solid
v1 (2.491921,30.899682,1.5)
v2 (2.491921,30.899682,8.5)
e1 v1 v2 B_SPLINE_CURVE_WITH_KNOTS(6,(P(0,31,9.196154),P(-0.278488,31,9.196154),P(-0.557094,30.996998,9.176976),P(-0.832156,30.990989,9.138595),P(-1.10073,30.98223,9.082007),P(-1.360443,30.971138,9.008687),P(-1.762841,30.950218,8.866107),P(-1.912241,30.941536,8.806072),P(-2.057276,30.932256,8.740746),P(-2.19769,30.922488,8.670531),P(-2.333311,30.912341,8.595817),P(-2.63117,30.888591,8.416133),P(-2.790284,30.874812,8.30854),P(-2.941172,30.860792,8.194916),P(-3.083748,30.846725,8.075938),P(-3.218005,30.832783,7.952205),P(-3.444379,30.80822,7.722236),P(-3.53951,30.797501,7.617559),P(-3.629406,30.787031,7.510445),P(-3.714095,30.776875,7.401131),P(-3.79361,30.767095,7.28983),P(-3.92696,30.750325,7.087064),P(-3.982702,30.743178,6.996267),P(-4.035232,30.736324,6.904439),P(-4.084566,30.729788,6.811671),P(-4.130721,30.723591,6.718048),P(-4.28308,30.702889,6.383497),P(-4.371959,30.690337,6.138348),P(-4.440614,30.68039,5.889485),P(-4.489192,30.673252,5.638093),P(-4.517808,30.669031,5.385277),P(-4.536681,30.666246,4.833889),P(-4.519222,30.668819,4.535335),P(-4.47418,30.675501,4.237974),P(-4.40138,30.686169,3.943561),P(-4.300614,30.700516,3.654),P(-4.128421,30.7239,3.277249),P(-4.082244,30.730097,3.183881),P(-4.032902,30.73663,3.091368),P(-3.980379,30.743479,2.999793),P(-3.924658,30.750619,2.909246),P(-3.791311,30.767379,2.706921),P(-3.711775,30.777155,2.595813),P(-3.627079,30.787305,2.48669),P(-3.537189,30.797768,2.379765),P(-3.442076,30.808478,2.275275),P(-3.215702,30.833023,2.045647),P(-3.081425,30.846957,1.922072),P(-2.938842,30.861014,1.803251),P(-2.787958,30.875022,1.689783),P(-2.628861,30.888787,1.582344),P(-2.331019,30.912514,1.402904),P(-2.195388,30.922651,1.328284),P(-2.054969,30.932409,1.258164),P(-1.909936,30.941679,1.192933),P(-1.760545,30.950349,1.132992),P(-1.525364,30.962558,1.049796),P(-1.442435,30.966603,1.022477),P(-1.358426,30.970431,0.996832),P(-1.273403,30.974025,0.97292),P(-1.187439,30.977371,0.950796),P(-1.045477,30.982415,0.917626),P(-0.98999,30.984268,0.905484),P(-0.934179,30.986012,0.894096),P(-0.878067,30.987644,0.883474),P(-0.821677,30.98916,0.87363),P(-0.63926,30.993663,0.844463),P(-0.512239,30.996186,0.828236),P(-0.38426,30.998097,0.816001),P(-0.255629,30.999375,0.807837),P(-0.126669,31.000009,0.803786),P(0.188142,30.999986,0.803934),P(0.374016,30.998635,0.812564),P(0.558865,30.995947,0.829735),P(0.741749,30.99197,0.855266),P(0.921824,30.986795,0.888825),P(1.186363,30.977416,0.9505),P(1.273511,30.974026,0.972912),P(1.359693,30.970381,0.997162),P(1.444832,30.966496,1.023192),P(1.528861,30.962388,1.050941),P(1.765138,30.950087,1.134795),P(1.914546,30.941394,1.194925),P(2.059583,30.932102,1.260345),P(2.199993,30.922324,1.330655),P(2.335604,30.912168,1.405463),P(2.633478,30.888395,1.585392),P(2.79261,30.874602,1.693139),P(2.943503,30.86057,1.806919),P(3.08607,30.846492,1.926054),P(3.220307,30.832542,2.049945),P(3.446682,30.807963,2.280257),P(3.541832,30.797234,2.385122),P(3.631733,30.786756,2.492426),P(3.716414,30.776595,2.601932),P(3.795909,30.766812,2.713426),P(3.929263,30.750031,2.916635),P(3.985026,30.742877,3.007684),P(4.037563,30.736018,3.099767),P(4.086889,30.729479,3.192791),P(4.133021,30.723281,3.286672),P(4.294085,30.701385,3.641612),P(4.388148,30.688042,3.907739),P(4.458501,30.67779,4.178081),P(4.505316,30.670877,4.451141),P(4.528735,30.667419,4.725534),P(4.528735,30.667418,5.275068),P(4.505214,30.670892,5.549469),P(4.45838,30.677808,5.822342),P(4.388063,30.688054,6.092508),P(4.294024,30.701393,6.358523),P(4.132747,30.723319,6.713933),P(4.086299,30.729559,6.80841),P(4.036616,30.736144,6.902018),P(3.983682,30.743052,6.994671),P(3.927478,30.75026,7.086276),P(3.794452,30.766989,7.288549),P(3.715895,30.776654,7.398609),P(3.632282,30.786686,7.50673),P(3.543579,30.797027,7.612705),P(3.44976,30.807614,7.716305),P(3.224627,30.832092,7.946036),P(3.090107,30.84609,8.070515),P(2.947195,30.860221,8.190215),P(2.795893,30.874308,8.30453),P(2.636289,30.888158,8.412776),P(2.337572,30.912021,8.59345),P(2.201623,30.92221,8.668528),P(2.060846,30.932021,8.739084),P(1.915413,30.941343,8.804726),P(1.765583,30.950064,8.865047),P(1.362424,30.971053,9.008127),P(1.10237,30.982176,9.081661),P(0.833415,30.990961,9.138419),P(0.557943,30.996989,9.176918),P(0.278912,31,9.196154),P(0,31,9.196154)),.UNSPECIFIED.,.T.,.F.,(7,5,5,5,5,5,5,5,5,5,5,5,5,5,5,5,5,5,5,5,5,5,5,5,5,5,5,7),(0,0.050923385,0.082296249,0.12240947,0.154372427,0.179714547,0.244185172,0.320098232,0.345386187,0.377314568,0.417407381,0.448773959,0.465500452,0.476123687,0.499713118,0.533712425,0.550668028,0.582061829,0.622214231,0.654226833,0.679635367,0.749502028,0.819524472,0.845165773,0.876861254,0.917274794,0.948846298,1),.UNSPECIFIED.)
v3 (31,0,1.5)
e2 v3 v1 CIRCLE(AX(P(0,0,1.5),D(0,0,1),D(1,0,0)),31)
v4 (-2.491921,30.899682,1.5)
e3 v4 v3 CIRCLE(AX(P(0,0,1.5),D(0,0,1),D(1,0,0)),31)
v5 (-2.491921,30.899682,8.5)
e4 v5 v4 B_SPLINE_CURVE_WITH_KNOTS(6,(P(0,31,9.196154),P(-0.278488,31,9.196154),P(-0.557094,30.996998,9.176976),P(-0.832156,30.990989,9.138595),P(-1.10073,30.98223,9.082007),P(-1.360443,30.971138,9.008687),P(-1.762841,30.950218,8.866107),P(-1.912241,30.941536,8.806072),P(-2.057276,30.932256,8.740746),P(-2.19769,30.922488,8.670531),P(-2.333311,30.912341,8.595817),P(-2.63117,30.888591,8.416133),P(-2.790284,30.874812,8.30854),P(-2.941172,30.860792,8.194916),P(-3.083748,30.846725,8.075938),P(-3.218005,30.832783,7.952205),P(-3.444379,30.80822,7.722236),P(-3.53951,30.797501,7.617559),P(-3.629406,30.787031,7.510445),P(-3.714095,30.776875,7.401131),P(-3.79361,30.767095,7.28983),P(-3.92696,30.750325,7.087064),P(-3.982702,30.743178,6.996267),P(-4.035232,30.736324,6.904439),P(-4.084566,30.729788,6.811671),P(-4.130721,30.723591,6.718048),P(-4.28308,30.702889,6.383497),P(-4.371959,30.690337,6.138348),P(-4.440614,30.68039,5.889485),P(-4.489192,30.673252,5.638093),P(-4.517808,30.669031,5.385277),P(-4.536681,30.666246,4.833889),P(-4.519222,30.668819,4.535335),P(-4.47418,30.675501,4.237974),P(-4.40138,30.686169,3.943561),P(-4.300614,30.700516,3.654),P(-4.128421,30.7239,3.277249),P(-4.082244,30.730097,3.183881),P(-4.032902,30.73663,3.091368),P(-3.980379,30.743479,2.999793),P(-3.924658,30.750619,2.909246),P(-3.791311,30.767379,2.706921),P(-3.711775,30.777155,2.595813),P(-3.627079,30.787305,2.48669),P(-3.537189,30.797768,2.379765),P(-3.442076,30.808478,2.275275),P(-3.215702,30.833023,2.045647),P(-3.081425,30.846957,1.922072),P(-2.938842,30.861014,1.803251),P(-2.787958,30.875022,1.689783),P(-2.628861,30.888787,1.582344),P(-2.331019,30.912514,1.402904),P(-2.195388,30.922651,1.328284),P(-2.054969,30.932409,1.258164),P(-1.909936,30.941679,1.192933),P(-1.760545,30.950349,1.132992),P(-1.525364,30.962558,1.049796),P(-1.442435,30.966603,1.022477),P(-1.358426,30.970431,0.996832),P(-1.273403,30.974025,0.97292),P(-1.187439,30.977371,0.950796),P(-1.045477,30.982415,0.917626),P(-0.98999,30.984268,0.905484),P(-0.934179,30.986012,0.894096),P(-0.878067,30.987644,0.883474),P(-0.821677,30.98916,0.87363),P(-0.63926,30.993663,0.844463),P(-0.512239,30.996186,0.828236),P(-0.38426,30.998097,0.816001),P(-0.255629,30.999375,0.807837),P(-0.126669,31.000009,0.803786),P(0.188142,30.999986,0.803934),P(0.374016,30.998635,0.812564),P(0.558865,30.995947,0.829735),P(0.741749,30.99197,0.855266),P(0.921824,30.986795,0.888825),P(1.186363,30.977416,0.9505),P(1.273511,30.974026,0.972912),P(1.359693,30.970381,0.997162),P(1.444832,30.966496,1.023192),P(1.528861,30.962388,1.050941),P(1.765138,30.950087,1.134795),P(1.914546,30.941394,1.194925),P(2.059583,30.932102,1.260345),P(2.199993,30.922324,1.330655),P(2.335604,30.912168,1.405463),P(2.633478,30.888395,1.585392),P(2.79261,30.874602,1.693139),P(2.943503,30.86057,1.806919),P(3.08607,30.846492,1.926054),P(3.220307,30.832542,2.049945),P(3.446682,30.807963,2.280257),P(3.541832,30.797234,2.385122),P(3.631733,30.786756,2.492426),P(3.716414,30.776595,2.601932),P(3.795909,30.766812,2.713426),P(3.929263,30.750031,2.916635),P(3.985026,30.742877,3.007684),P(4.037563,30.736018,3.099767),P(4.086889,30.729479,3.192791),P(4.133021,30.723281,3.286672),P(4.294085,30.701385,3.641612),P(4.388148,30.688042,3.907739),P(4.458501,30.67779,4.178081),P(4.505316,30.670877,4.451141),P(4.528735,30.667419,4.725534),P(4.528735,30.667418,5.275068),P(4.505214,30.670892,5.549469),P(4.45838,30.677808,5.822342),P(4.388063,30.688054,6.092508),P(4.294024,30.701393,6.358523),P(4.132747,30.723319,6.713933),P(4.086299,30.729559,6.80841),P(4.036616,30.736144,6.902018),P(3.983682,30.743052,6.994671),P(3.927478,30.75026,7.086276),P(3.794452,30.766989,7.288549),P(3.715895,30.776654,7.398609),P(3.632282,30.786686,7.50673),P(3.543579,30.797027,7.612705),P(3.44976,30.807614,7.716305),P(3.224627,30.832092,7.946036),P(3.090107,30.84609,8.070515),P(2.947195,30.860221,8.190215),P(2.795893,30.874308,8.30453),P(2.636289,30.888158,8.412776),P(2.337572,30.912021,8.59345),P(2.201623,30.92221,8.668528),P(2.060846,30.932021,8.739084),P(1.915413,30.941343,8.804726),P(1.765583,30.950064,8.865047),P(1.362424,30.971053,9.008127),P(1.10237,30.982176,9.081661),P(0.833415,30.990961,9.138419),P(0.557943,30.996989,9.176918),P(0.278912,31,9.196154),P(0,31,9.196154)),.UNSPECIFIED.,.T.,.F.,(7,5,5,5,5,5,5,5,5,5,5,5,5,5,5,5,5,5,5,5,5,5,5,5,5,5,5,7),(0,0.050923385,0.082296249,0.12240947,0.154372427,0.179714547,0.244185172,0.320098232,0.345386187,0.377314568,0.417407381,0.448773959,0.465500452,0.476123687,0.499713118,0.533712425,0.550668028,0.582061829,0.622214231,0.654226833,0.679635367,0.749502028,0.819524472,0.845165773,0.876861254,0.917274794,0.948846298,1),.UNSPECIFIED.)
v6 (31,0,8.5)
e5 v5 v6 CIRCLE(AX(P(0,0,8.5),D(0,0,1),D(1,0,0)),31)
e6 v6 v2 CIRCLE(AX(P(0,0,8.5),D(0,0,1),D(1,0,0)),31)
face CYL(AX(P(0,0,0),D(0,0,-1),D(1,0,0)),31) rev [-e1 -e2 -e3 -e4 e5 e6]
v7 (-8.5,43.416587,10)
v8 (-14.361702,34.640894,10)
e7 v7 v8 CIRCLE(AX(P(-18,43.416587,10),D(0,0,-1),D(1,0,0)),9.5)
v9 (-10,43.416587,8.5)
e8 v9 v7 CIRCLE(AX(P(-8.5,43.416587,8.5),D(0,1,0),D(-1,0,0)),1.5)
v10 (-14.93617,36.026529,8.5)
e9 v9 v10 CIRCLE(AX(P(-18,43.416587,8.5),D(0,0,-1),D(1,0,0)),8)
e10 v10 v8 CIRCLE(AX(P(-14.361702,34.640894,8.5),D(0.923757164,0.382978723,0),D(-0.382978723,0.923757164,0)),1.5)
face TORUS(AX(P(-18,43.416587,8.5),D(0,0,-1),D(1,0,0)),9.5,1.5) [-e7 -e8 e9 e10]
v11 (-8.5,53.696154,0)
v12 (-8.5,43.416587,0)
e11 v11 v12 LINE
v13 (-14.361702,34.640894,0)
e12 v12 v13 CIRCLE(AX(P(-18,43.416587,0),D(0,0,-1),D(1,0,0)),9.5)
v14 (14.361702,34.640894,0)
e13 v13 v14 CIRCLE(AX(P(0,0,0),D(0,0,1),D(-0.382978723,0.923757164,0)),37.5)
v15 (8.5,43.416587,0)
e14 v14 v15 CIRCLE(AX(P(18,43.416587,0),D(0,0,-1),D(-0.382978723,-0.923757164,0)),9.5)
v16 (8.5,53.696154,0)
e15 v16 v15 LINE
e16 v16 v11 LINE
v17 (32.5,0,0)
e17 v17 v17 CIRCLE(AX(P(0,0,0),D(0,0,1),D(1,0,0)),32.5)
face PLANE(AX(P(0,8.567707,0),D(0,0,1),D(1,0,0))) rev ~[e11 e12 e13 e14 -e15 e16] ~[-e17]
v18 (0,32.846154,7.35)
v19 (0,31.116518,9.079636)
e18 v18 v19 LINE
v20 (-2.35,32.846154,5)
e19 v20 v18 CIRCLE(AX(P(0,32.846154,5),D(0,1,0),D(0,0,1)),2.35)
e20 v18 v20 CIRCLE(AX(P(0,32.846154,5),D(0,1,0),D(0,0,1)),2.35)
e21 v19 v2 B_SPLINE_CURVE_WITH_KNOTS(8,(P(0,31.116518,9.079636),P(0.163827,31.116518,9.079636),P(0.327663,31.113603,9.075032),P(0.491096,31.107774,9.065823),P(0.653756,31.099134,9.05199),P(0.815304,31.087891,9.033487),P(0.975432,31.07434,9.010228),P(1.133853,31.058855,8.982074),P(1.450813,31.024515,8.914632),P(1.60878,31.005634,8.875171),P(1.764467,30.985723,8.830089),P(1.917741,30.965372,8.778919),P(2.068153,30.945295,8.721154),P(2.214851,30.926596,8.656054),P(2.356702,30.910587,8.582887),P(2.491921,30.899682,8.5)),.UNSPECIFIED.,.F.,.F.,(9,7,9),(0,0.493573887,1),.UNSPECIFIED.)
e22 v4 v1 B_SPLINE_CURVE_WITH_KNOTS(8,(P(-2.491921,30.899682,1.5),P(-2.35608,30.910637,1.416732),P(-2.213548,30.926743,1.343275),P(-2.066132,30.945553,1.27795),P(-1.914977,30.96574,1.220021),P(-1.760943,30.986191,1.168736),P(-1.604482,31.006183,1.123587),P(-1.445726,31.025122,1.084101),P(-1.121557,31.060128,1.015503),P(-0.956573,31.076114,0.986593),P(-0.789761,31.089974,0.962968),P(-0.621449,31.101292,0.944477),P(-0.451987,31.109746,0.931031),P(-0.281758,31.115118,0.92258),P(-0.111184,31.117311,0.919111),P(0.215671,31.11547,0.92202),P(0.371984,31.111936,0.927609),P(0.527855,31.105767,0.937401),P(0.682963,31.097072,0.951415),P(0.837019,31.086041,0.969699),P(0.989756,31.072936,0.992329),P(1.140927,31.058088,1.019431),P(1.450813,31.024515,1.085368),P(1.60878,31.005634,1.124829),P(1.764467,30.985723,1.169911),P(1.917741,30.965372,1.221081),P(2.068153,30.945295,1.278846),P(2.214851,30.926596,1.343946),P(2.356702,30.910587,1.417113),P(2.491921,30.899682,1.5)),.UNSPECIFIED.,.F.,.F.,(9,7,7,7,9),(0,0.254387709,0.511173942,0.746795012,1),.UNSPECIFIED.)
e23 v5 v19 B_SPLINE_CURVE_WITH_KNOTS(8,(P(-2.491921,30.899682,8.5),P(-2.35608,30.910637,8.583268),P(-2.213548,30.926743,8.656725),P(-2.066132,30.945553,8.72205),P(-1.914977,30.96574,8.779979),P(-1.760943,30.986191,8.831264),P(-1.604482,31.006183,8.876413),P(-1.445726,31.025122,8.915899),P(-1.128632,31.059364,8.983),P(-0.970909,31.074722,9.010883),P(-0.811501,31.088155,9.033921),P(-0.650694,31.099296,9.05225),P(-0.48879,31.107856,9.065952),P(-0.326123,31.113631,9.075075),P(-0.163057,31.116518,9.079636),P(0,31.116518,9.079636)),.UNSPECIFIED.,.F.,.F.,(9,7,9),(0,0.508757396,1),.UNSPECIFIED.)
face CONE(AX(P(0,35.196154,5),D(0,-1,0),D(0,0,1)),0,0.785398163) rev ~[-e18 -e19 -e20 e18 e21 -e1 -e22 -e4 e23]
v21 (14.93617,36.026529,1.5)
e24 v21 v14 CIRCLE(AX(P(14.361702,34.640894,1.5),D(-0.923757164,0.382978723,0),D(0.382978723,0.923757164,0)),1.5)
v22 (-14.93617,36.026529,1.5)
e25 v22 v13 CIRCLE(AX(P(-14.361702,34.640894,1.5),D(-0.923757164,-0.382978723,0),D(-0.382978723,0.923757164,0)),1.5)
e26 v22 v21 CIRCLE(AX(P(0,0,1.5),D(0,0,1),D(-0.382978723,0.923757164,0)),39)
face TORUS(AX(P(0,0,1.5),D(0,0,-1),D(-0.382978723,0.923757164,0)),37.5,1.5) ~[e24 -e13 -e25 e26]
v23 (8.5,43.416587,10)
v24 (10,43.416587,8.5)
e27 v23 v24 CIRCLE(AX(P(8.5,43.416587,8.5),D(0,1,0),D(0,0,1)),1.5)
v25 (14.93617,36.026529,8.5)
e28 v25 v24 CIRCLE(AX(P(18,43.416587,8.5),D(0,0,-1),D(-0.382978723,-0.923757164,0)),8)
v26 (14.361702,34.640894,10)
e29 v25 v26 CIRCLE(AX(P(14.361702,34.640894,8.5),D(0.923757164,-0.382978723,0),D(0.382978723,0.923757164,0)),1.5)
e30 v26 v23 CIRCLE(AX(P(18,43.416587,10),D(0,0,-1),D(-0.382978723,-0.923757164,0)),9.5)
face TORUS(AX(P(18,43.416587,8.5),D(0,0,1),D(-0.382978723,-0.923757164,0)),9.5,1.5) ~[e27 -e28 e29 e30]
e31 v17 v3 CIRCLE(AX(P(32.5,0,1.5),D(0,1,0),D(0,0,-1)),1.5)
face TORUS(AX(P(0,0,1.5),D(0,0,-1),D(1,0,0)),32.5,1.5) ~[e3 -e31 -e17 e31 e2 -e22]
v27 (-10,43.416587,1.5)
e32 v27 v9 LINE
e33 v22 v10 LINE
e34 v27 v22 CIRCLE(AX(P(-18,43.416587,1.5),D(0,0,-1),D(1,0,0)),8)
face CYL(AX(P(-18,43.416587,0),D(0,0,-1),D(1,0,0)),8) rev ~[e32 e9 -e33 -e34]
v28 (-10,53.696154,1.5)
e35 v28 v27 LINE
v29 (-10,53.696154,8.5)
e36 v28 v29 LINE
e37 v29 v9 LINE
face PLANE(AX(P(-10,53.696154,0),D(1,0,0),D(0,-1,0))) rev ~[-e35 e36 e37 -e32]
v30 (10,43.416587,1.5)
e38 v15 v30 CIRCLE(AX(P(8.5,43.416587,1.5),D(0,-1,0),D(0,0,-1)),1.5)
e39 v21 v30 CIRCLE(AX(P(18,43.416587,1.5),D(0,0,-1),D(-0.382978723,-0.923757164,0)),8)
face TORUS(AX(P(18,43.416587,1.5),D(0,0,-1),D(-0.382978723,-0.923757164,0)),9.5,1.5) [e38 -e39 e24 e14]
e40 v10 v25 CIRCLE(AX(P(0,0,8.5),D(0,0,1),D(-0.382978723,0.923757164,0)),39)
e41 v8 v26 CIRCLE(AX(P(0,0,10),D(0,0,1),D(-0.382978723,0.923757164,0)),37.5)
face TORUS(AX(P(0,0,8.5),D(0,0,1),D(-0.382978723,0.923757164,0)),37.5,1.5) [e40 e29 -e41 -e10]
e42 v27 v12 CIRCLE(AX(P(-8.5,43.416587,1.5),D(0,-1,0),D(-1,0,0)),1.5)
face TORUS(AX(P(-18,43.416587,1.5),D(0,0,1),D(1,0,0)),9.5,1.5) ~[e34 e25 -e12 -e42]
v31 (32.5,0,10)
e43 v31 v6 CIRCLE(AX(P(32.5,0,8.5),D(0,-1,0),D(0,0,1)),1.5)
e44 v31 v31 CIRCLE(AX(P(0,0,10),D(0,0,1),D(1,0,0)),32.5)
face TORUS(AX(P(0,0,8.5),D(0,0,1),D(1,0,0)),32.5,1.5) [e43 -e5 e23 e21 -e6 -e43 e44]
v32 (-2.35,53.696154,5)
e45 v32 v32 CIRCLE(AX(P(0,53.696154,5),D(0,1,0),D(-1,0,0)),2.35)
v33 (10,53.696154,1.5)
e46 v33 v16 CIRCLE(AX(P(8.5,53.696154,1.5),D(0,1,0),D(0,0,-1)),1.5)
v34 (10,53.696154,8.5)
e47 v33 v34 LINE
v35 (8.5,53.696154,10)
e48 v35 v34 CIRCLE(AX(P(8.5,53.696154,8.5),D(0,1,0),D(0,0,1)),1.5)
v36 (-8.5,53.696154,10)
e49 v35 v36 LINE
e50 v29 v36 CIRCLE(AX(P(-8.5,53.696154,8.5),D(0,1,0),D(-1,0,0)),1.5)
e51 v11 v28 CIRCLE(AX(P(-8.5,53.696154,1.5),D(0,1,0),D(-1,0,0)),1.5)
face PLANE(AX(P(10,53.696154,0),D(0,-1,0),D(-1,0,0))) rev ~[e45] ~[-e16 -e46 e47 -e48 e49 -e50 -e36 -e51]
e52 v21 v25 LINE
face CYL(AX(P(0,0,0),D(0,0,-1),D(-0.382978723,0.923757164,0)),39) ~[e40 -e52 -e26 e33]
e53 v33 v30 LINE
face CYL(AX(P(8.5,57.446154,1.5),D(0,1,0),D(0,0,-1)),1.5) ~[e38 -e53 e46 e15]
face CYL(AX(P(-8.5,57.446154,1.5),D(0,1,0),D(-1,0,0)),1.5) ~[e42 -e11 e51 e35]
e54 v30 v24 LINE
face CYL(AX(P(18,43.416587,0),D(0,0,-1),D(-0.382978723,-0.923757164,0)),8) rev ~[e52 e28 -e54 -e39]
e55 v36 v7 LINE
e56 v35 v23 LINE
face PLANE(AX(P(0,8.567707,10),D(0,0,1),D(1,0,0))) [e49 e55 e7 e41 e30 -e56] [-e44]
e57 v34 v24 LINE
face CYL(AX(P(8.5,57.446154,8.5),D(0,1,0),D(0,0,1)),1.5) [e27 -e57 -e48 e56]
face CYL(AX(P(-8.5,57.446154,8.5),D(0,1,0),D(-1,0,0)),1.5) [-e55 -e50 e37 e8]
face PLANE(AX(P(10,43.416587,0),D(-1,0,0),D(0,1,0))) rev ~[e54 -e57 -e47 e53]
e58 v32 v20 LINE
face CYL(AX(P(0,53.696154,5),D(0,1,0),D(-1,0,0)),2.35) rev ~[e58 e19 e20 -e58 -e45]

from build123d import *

# Parameters (mm, degrees)
F0_R         = 31
F1_DEPTH     = 10
F2_R         = 2.35
F3_DEPTH     = 22.7863546661
F6_T1_DEPTH  = 14.0295669578
F6_T4_ANGLE  = 314.9633717383
F6_T6_ANGLE  = 314.9633717383
F6_T12_ANGLE = 67.4816858691
F6_T14_ANGLE = 67.4816858691
F6_T16_ANGLE = 67.4816858691
F6_T18_ANGLE = 67.4816858691


# Not quite as in the source:
# - a fillet or chamfer that OpenCascade refuses, or shapes differently, is made with other operations: its cross-section is extruded or revolved along the edge and cut away or added


with BuildPart() as f1:
    # F0 (on Top) → F1 (new body)
    with BuildSketch(Plane.XY):
        with BuildLine():
            ThreePointArc((-10, 43.4165866922), (-11.3475328525, 38.9730879748), (-14.9361702128, 36.0265293829))
            ThreePointArc((-14.9361702128, 36.0265293829), (0, -39), (14.9361702128, 36.0265293829))
            ThreePointArc((14.9361702128, 36.0265293829), (11.3475328525, 38.9730879748), (10, 43.4165866922))
            Line((10, 43.4165866922), (10, 53.6961536499))
            Line((10, 53.6961536499), (-10, 53.6961536499))
            Line((-10, 53.6961536499), (-10, 43.4165866922))
        make_face()
        Circle(F0_R, mode=Mode.SUBTRACT)
    extrude(amount=F1_DEPTH)

    # F2 (on face) → F3 (cut, through all)
    with BuildSketch(Plane(origin=(0, 53.6961536499, 0), x_dir=(-1, 0, 0), z_dir=(0, 1, 0))):
        with Locations((0, 5)):
            Circle(F2_R)
    extrude(amount=-F3_DEPTH, mode=Mode.SUBTRACT)

    # F4 (on Right) → F5 (revolve, cut)
    with BuildSketch(Plane.YZ):
        Polygon((35.1961536499, 5), (30.1961536499, 10), (30.1961536499, 5), align=None)
    revolve(axis=Axis((0, 32.6961536499, 5), (0, -1, 0)), mode=Mode.SUBTRACT)

    # F6: fillet of radius 1.5 on 12 edges, made by hand

    # F6_s2 → F6_t1 (cut)
    with BuildSketch(Plane.XZ.offset(-57.4461536499)):
        with BuildLine():
            ThreePointArc((-10, 1.5), (-9.5606601718, 0.4393398282), (-8.5, 0))
            Line((-8.5, 0), (-10, 0))
            Line((-10, 0), (-10, 1.5))
        make_face()
        with BuildLine():
            ThreePointArc((-10, 8.5), (-9.5606601718, 9.5606601718), (-8.5, 10))
            Line((-8.5, 10), (-10, 10))
            Line((-10, 10), (-10, 8.5))
        make_face()
        with BuildLine():
            ThreePointArc((8.5, 0), (9.5606601718, 0.4393398282), (10, 1.5))
            Line((10, 1.5), (10, 0))
            Line((10, 0), (8.5, 0))
        make_face()
        with BuildLine():
            ThreePointArc((8.5, 10), (9.5606601718, 9.5606601718), (10, 8.5))
            Line((10, 8.5), (10, 10))
            Line((10, 10), (8.5, 10))
        make_face()
    extrude(amount=F6_T1_DEPTH, mode=Mode.SUBTRACT)

    # F6_s3 → F6_t4 (revolve, cut)
    with BuildSketch(Plane(origin=(0, 0, 0), x_dir=(0, 0, 1), z_dir=(0.9237571637, 0.3829787234, 0))):
        with BuildLine():
            ThreePointArc((8.5, -39), (9.5606601718, -38.5606601718), (10, -37.5))
            Line((10, -37.5), (10, -39))
            Line((10, -39), (8.5, -39))
        make_face()
    revolve(axis=Axis((0, 0, 10), (0, 0, 1)), revolution_arc=F6_T4_ANGLE, mode=Mode.SUBTRACT)

    # F6_s5 → F6_t6 (revolve, cut)
    with BuildSketch(Plane(origin=(0, 0, 0), x_dir=(0, 0, 1), z_dir=(0.9237571637, 0.3829787234, 0))):
        with BuildLine():
            ThreePointArc((1.5, -39), (0.4393398282, -38.5606601718), (0, -37.5))
            Line((0, -37.5), (0, -39))
            Line((0, -39), (1.5, -39))
        make_face()
    revolve(axis=Axis((0, 0, 0), (0, 0, 1)), revolution_arc=F6_T6_ANGLE, mode=Mode.SUBTRACT)

    # F6_s7 → F6_t8 (revolve, cut)
    with BuildSketch(Plane.XZ):
        with BuildLine():
            ThreePointArc((32.5, 0), (31.4393398282, 0.4393398282), (31, 1.5))
            Line((31, 1.5), (31, 0))
            Line((31, 0), (32.5, 0))
        make_face()
    revolve(axis=Axis((0, 0, 0), (0, 0, 1)), mode=Mode.SUBTRACT)

    # F6_s9 → F6_t10 (revolve, cut)
    with BuildSketch(Plane.XZ):
        with BuildLine():
            ThreePointArc((32.5, 10), (31.4393398282, 9.5606601718), (31, 8.5))
            Line((31, 8.5), (31, 10))
            Line((31, 10), (32.5, 10))
        make_face()
    revolve(axis=Axis((0, 0, 10), (0, 0, 1)), mode=Mode.SUBTRACT)

    # F6_s11 → F6_t12 (revolve, cut)
    with BuildSketch(Plane.XZ.offset(-43.4165866922)):
        with BuildLine():
            ThreePointArc((-10, 1.5), (-9.5606601718, 0.4393398282), (-8.5, 0))
            Line((-8.5, 0), (-10, 0))
            Line((-10, 0), (-10, 1.5))
        make_face()
    revolve(axis=Axis((-18, 43.4165866922, 0), (0, 0, -1)), revolution_arc=F6_T12_ANGLE, mode=Mode.SUBTRACT)

    # F6_s13 → F6_t14 (revolve, cut)
    with BuildSketch(Plane.XZ.offset(-43.4165866922)):
        with BuildLine():
            ThreePointArc((-10, 8.5), (-9.5606601718, 9.5606601718), (-8.5, 10))
            Line((-8.5, 10), (-10, 10))
            Line((-10, 10), (-10, 8.5))
        make_face()
    revolve(axis=Axis((-18, 43.4165866922, 10), (0, 0, -1)), revolution_arc=F6_T14_ANGLE, mode=Mode.SUBTRACT)

    # F6_s15 → F6_t16 (revolve, cut)
    with BuildSketch(Plane(origin=(0, 0, 0), x_dir=(0, 0, 1), z_dir=(0.9237571637, -0.3829787234, 0))):
        with BuildLine():
            ThreePointArc((0, -37.5), (0.4393398282, -38.5606601718), (1.5, -39))
            Line((1.5, -39), (0, -39))
            Line((0, -39), (0, -37.5))
        make_face()
    revolve(axis=Axis((18, 43.4165866922, 0), (0, 0, -1)), revolution_arc=F6_T16_ANGLE, mode=Mode.SUBTRACT)

    # F6_s17 → F6_t18 (revolve, cut)
    with BuildSketch(Plane(origin=(0, 0, 0), x_dir=(0, 0, 1), z_dir=(0.9237571637, -0.3829787234, 0))):
        with BuildLine():
            ThreePointArc((10, -37.5), (9.5606601718, -38.5606601718), (8.5, -39))
            Line((8.5, -39), (10, -39))
            Line((10, -39), (10, -37.5))
        make_face()
    revolve(axis=Axis((18, 43.4165866922, 10), (0, 0, -1)), revolution_arc=F6_T18_ANGLE, mode=Mode.SUBTRACT)


solid = f1.part
